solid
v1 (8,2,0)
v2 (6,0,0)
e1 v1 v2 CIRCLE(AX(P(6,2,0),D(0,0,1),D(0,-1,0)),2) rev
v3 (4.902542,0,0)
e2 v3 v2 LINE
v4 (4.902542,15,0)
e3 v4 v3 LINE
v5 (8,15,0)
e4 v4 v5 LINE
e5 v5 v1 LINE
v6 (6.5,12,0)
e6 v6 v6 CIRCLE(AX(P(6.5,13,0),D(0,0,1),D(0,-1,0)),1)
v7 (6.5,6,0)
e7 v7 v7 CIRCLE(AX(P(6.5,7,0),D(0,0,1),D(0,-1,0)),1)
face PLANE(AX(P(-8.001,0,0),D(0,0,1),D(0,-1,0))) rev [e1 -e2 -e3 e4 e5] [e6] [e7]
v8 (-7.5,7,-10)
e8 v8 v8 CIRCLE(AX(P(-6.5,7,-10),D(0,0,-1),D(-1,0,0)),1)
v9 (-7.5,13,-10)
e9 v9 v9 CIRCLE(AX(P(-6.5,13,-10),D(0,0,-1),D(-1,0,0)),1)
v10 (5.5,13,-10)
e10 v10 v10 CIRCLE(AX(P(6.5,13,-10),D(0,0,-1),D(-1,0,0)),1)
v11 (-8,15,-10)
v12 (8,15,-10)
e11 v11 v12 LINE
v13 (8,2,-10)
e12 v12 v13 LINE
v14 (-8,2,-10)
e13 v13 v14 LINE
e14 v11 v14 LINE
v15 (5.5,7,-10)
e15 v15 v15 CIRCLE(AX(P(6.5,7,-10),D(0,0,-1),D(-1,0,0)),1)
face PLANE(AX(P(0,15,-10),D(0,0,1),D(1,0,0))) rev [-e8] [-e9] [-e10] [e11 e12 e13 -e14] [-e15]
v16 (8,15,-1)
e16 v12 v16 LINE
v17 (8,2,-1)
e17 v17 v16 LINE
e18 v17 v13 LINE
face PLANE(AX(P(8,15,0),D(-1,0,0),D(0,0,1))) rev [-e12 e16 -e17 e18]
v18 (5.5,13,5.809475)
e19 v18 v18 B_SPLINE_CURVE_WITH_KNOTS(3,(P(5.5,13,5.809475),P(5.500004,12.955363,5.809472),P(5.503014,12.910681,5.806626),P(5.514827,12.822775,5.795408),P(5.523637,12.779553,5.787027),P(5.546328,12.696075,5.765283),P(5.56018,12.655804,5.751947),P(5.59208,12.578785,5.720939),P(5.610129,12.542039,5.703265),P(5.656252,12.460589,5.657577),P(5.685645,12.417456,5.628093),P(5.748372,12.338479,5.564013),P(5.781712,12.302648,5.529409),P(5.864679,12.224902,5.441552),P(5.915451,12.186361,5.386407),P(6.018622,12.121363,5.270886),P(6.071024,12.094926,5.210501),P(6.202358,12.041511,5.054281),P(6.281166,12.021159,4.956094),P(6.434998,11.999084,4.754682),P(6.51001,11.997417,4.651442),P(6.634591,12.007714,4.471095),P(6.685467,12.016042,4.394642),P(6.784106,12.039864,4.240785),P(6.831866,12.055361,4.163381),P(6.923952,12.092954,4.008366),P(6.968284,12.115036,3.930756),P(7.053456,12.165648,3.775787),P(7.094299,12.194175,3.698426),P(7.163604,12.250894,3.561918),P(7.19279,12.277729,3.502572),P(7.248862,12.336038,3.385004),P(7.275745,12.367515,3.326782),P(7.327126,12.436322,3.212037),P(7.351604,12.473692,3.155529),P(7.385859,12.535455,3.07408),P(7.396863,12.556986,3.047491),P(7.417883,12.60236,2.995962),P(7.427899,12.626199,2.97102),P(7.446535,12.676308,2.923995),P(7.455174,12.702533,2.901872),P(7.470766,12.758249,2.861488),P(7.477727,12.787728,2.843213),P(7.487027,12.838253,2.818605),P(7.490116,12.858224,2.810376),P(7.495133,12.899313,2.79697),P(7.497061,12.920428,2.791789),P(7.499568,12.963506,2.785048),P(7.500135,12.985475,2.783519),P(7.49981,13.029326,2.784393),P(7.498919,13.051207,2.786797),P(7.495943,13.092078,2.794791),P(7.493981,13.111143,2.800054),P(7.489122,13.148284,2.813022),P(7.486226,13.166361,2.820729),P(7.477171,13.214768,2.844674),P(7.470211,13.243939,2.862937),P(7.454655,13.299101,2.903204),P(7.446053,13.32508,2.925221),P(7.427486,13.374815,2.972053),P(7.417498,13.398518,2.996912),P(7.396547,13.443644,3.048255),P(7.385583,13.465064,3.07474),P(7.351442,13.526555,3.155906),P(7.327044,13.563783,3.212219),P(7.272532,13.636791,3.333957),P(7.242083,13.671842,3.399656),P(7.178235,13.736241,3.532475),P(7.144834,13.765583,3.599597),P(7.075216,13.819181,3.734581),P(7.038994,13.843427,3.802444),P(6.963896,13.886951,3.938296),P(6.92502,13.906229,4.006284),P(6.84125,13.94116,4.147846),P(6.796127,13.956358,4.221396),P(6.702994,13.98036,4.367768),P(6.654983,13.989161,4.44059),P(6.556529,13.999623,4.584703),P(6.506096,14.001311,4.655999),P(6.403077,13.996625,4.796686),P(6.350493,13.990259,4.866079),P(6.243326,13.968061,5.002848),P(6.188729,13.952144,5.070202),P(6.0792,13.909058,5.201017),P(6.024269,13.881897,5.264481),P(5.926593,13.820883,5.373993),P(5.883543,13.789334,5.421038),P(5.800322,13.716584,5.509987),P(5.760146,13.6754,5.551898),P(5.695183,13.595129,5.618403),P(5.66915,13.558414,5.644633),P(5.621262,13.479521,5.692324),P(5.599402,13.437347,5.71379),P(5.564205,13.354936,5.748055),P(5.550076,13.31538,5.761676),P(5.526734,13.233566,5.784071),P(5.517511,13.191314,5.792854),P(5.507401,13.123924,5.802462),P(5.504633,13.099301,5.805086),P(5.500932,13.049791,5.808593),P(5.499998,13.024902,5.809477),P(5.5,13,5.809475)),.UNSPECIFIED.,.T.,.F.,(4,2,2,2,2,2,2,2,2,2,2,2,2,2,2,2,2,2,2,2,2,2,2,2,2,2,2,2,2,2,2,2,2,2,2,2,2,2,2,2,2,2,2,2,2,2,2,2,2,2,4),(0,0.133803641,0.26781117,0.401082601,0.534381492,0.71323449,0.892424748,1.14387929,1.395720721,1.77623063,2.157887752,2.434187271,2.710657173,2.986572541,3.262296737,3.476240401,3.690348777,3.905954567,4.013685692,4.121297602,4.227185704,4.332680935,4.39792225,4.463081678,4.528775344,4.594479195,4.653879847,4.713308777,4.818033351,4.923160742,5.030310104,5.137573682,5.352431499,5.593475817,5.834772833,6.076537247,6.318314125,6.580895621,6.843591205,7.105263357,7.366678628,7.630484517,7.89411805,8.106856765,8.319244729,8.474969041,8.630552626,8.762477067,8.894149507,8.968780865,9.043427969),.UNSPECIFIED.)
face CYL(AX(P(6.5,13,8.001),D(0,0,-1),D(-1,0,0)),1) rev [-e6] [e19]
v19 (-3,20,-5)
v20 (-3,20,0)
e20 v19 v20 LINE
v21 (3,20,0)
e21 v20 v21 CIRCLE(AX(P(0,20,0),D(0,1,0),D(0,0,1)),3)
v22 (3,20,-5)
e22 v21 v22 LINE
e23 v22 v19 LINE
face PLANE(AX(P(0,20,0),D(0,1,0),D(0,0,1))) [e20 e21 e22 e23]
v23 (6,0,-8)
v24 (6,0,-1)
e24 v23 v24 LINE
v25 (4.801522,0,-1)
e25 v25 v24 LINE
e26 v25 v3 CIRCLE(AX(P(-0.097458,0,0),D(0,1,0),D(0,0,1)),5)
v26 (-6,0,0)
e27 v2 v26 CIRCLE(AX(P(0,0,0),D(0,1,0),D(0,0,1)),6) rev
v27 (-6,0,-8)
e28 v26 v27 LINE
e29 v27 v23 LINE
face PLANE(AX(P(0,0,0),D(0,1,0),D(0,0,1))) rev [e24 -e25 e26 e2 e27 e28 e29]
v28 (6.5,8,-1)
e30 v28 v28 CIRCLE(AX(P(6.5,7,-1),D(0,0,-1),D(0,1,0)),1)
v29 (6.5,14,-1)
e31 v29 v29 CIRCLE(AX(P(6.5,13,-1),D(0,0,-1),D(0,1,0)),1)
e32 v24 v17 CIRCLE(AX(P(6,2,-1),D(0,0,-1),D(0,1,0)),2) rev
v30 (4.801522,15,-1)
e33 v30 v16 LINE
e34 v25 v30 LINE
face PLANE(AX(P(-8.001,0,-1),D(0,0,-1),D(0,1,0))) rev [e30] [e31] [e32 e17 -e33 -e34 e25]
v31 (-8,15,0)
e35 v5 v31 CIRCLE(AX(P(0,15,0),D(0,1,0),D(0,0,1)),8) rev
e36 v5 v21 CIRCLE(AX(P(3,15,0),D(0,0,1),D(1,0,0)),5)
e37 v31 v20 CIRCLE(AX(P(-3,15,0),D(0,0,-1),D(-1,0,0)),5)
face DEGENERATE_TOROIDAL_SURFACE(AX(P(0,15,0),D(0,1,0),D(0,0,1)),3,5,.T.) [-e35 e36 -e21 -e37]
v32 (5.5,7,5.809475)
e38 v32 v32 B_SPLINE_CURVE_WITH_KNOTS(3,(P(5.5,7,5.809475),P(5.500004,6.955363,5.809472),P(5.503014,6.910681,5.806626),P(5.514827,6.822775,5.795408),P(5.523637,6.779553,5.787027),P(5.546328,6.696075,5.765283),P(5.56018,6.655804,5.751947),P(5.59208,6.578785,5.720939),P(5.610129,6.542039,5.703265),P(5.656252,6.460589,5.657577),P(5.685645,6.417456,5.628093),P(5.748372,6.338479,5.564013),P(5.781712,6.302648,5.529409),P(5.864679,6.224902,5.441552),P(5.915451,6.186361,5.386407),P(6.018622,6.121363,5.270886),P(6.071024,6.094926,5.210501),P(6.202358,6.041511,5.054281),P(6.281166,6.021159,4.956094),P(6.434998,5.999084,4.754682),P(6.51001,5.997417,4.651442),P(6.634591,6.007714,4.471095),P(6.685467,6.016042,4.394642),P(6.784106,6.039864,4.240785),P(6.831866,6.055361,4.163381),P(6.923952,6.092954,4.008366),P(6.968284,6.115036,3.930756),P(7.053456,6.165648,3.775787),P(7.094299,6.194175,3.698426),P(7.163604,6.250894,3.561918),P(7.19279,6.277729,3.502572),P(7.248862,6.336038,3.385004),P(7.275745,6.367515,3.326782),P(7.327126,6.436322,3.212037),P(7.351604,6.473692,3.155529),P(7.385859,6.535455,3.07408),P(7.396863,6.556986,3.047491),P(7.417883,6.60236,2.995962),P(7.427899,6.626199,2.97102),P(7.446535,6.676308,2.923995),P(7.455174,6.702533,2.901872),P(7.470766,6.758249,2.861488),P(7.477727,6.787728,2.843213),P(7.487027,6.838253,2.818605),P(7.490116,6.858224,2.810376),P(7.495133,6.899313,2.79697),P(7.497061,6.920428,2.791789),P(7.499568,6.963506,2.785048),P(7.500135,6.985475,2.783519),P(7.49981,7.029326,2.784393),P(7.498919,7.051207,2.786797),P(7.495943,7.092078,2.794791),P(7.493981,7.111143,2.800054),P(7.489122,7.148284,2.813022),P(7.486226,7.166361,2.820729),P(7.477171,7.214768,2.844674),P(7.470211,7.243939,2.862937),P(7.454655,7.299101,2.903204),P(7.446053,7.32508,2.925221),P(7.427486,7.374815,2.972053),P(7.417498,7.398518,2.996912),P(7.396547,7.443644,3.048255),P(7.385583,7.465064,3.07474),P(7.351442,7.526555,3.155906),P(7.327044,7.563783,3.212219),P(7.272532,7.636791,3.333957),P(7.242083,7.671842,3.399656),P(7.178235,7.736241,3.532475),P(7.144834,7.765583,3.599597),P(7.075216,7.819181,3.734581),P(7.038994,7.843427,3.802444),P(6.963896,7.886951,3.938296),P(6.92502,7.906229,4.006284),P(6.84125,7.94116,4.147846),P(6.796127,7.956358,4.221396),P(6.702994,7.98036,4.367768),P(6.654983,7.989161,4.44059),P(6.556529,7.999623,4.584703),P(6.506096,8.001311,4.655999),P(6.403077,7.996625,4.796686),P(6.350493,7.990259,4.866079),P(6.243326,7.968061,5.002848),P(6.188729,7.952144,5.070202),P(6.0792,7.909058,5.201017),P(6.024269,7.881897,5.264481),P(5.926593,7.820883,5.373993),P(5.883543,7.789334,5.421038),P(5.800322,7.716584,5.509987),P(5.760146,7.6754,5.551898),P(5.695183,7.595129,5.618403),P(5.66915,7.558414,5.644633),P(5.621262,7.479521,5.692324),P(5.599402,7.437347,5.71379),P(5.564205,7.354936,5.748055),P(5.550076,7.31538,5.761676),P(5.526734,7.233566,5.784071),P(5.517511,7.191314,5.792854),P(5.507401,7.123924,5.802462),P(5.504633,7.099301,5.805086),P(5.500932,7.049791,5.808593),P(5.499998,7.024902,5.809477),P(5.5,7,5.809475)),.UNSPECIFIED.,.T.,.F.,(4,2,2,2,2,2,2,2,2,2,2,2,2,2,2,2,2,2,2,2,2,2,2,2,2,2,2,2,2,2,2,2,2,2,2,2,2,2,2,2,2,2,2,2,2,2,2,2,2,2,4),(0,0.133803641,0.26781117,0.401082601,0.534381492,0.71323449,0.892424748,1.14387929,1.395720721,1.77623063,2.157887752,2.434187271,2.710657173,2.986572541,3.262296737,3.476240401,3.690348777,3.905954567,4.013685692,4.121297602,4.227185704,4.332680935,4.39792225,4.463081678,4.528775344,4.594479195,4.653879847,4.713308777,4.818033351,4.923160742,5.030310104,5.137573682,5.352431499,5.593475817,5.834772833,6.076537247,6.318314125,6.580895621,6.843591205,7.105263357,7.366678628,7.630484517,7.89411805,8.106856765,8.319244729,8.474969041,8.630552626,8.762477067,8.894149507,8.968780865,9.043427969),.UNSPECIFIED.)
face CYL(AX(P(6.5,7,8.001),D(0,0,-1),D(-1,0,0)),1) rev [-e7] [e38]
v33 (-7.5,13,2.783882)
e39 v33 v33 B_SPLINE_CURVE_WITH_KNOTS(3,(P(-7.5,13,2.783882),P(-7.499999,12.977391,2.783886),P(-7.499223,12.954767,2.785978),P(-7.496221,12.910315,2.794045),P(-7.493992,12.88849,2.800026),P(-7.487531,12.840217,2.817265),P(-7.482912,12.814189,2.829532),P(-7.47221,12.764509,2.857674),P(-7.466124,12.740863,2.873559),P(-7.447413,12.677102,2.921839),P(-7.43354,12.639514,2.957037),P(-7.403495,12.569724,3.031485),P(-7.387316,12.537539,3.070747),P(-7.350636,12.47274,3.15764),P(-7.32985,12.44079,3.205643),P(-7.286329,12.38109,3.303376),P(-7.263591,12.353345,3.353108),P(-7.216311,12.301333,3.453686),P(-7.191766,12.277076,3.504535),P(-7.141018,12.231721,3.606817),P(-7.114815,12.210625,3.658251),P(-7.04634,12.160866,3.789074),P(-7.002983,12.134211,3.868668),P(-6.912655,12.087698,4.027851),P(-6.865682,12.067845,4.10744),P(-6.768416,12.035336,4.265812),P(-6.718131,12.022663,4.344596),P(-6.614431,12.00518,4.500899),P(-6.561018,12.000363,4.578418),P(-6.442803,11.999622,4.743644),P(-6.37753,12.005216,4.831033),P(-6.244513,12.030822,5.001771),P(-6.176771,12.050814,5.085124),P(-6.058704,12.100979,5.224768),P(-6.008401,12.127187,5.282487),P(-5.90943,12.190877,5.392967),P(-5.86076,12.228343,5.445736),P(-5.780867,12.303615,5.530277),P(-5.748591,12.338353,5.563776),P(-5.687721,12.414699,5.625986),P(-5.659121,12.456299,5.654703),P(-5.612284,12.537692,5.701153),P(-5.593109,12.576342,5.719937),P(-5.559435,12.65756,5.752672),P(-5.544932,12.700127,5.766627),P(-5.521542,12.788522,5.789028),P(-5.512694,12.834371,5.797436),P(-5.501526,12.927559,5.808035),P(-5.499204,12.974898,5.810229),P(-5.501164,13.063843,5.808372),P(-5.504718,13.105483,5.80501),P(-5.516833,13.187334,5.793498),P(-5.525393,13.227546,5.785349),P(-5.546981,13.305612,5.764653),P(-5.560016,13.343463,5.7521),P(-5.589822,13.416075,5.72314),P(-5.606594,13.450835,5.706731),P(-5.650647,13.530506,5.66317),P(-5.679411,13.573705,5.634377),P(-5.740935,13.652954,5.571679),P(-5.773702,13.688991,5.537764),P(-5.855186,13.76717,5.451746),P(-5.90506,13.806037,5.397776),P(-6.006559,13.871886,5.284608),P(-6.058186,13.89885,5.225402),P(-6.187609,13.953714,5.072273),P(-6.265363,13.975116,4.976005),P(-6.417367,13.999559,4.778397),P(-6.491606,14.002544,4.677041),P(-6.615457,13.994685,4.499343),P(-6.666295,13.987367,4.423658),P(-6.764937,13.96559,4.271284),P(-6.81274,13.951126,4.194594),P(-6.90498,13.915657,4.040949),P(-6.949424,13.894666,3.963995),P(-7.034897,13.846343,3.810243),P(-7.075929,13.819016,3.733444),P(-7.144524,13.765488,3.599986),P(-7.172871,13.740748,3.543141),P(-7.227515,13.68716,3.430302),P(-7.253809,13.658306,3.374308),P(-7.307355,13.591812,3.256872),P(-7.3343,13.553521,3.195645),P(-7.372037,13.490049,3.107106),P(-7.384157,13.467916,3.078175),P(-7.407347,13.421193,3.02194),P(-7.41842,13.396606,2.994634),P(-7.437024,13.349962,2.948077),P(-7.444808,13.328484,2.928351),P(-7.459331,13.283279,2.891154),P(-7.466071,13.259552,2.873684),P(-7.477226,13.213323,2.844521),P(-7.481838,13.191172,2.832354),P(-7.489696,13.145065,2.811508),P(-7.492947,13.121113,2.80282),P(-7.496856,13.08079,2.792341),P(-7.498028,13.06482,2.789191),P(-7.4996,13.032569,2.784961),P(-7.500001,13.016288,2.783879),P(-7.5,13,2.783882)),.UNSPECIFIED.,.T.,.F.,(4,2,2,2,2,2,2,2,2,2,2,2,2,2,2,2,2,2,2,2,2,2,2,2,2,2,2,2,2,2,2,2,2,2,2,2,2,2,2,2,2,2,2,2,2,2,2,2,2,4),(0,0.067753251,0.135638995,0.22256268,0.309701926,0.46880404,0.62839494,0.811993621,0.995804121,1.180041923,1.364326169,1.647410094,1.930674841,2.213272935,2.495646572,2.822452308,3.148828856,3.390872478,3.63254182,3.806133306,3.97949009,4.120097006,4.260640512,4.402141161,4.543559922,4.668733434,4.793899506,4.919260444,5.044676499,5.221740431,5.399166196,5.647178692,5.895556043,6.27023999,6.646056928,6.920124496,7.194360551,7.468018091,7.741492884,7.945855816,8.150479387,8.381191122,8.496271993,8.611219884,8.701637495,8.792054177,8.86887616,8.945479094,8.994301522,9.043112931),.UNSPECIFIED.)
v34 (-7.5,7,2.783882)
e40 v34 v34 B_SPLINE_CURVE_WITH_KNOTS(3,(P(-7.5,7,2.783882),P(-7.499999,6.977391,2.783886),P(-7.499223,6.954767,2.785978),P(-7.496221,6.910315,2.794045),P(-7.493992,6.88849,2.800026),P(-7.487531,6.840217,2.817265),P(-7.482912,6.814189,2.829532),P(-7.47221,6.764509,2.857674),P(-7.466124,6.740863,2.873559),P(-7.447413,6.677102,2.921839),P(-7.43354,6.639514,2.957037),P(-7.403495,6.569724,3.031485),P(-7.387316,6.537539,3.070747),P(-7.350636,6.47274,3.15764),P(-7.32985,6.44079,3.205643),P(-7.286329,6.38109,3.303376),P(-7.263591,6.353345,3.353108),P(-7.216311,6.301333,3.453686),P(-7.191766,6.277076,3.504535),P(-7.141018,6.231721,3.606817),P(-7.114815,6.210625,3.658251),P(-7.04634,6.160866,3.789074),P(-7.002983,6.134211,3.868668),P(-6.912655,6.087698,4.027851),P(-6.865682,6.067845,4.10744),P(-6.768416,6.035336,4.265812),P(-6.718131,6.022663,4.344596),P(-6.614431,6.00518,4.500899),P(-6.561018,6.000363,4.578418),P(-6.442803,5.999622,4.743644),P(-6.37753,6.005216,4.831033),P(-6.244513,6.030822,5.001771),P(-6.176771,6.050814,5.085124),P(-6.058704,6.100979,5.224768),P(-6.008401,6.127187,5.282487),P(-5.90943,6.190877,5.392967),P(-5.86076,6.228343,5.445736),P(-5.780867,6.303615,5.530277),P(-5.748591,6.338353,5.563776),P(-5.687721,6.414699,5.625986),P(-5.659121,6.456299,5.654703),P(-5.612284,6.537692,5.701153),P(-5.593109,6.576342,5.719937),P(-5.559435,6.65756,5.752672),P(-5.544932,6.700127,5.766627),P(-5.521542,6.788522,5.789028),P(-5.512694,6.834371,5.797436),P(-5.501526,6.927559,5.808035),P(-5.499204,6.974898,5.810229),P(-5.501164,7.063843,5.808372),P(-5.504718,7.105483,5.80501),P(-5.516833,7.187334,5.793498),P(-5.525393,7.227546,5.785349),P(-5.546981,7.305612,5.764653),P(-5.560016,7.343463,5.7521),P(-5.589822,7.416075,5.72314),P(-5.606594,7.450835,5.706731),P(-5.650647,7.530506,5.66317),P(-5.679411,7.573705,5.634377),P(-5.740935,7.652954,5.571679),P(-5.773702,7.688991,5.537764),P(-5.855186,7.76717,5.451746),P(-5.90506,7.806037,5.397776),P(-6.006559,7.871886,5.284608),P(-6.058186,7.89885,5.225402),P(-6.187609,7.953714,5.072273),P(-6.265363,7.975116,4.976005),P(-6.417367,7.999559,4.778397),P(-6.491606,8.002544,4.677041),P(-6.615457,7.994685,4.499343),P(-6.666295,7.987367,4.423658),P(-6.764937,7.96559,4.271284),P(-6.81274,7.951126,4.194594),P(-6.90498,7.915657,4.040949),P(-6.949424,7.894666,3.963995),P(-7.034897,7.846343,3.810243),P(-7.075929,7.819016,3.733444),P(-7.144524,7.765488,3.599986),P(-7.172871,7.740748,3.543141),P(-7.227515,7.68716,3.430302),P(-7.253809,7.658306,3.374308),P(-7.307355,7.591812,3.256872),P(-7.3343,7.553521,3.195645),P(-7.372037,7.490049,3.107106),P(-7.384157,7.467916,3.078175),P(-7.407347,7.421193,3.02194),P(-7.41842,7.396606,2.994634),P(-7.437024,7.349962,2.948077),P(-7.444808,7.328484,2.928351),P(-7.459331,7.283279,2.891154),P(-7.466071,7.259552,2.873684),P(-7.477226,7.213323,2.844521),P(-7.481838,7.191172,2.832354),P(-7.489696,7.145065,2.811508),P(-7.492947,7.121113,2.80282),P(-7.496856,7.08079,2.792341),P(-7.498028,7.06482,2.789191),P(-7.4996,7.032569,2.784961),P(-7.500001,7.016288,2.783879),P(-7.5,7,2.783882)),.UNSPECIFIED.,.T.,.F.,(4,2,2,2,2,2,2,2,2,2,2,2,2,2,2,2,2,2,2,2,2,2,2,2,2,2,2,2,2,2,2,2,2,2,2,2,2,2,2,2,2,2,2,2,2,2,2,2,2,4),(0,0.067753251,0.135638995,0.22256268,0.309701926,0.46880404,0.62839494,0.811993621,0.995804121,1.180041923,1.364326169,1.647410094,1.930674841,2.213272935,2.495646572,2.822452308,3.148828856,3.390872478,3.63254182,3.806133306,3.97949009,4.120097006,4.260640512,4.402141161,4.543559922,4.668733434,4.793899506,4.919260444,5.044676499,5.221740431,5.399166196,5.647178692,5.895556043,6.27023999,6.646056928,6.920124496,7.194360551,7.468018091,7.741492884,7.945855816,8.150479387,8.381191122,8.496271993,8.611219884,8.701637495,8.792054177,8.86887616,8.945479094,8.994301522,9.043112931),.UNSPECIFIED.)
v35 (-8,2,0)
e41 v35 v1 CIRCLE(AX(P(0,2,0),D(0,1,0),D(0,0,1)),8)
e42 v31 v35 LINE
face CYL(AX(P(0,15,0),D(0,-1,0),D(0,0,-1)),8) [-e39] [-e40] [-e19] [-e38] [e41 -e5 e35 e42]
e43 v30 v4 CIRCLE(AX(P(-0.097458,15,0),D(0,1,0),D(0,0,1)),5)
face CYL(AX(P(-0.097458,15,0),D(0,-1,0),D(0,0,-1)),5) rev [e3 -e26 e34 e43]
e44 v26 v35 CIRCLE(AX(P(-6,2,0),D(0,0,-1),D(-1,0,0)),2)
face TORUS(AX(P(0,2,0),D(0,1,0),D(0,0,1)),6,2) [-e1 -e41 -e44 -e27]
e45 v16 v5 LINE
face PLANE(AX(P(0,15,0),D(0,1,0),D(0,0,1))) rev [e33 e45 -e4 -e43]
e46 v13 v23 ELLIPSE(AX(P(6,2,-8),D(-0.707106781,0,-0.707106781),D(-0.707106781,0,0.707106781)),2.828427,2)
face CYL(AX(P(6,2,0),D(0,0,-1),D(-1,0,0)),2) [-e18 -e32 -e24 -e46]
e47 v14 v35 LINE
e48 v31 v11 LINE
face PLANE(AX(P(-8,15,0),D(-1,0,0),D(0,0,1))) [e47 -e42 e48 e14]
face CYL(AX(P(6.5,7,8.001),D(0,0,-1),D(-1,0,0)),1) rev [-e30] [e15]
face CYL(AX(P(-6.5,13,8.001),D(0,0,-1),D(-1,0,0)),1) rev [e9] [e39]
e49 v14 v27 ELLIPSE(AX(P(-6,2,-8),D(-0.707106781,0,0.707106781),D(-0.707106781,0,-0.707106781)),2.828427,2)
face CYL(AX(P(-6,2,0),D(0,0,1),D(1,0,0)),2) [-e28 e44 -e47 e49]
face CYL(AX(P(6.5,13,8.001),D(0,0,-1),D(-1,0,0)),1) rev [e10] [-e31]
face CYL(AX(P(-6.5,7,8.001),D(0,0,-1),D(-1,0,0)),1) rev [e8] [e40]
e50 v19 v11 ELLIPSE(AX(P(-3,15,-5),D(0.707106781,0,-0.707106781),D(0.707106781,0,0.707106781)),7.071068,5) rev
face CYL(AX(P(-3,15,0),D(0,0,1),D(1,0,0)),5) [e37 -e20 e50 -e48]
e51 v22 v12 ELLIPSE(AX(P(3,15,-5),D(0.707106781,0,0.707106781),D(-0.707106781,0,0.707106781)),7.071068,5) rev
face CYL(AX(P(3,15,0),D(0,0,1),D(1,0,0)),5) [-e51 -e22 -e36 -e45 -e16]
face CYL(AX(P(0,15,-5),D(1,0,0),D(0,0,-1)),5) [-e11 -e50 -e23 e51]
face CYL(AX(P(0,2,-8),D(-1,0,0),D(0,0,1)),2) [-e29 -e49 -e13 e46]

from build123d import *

# Parameters (mm, degrees)
BOSS_EXTRU_1_DEPTH           = 15
ESQUISSE3_R                  = 5
BOSS_EXTRU_3_DEPTH           = 5
ENL_V_MAT_EXTRU_2_REACH      = 30.071
ESQUISSE4_R                  = 1
ENL_V_MAT_EXTRU_3_REACH      = 29.495
ENL_V_MAT_EXTRU_3_END_RADIUS = 5
ESQUISSE5_W                  = 1
ESQUISSE5_H                  = 15
CONG_3_START                 = -10
CONG_3_DEPTH                 = 18
CONG_3_START_2               = -9
CONG_3_2_DEPTH               = 18
CONG_3_3_ANGLE               = 180
CONG_5_R                     = 2


with BuildPart() as part:
    # Esquisse1 → Boss.-Extru.1 (new body)
    with BuildSketch(Plane(origin=(0, 0, 0), x_dir=(1, 0, 0), z_dir=(0, 1, 0))):
        with BuildLine():
            ThreePointArc((-8, 0), (0, 8), (8, 0))
            Line((8, 0), (8, 10))
            Line((8, 10), (-8, 10))
            Line((-8, 10), (-8, 0))
        make_face()
        with BuildLine():
            ThreePointArc((-8, 0), (0, -8), (8, 0))
            Line((8, 0), (4.902542424, 0))
            ThreePointArc((4.902542424, 0), (-0.097457576, -5), (-5.097457576, 0))
            Line((-5.097457576, 0), (-8, 0))
        make_face()
        with BuildLine():
            Line((4.902542424, 0), (8, 0))
            ThreePointArc((8, 0), (0, 8), (-8, 0))
            Line((-8, 0), (-5.097457576, 0))
            ThreePointArc((-5.097457576, 0), (-0.097457576, 5), (4.902542424, 0))
        make_face()
    extrude(amount=BOSS_EXTRU_1_DEPTH)

    # Esquisse3 → Boss.-Extru.3 (add)
    # profile 1 of 3: a face of its own
    with BuildSketch(Plane(origin=(0, 15, 0), x_dir=(1, 0, 0), z_dir=(0, 1, 0))):
        with BuildLine():
            ThreePointArc((8, 0), (0, 8), (-8, 0))
            ThreePointArc((-8, 0), (0, -8), (8, 0))
        make_face()
        with Locations(Location((-0.097457576, 0, 0), (0, 0, 270))):
            Circle(ESQUISSE3_R, mode=Mode.SUBTRACT)
    # profile 2 of 3: a face of its own
    with BuildSketch(Plane(origin=(0, 15, 0), x_dir=(1, 0, 0), z_dir=(0, 1, 0))):
        with Locations(Location((-0.097457576, 0, 0), (0, 0, 270))):
            Circle(ESQUISSE3_R)
    # profile 3 of 3: a face of its own
    with BuildSketch(Plane(origin=(0, 15, 0), x_dir=(1, 0, 0), z_dir=(0, 1, 0))):
        with BuildLine():
            Line((-8, 10), (-8, 0))
            ThreePointArc((-8, 0), (0, 8), (8, 0))
            Line((8, 0), (8, 10))
            Line((8, 10), (-8, 10))
        make_face()
    extrude(amount=BOSS_EXTRU_3_DEPTH)

    # Esquisse4 → Enlèv. mat.-Extru.2 (cut, up to next)
    with BuildSketch(Plane(origin=(0, 0, -10), x_dir=(-1, 0, 0), z_dir=(0, 0, -1)), mode=Mode.PRIVATE) as enl_v_mat_extru_2_sk1:
        with Locations((-6.5, 13)):
            Circle(ESQUISSE4_R)
    enl_v_mat_extru_2_tool1 = extrude(enl_v_mat_extru_2_sk1.sketch, amount=-ENL_V_MAT_EXTRU_2_REACH, mode=Mode.PRIVATE) & part.part
    # Esquisse4 → Enlèv. mat.-Extru.2 (cut, up to next)
    with BuildSketch(Plane(origin=(0, 0, -10), x_dir=(-1, 0, 0), z_dir=(0, 0, -1)), mode=Mode.PRIVATE) as enl_v_mat_extru_2_sk2:
        with Locations((6.5, 13)):
            Circle(ESQUISSE4_R)
    enl_v_mat_extru_2_tool2 = extrude(enl_v_mat_extru_2_sk2.sketch, amount=-ENL_V_MAT_EXTRU_2_REACH, mode=Mode.PRIVATE) & part.part
    # Esquisse4 → Enlèv. mat.-Extru.2 (cut, up to next)
    with BuildSketch(Plane(origin=(0, 0, -10), x_dir=(-1, 0, 0), z_dir=(0, 0, -1)), mode=Mode.PRIVATE) as enl_v_mat_extru_2_sk3:
        with Locations((6.5, 7)):
            Circle(ESQUISSE4_R)
    enl_v_mat_extru_2_tool3 = extrude(enl_v_mat_extru_2_sk3.sketch, amount=-ENL_V_MAT_EXTRU_2_REACH, mode=Mode.PRIVATE) & part.part
    # Esquisse4 → Enlèv. mat.-Extru.2 (cut, up to next)
    with BuildSketch(Plane(origin=(0, 0, -10), x_dir=(-1, 0, 0), z_dir=(0, 0, -1)), mode=Mode.PRIVATE) as enl_v_mat_extru_2_sk4:
        with Locations((-6.5, 7)):
            Circle(ESQUISSE4_R)
    enl_v_mat_extru_2_tool4 = extrude(enl_v_mat_extru_2_sk4.sketch, amount=-ENL_V_MAT_EXTRU_2_REACH, mode=Mode.PRIVATE) & part.part
    add(enl_v_mat_extru_2_tool1.solids().sort_by_distance((6.5, 13, -10))[0], mode=Mode.SUBTRACT)
    add(enl_v_mat_extru_2_tool2.solids().sort_by_distance((-6.5, 13, -10))[0], mode=Mode.SUBTRACT)
    add(enl_v_mat_extru_2_tool3.solids().sort_by_distance((-6.5, 7, -10))[0], mode=Mode.SUBTRACT)
    add(enl_v_mat_extru_2_tool4.solids().sort_by_distance((6.5, 7, -10))[0], mode=Mode.SUBTRACT)

    # Enlèv. mat.-Extru.3: up to this cylinder (the profile starts outside it)
    enl_v_mat_extru_3_end = Plane(origin=(-0.097457576, 7.5, 0), z_dir=(0, -1, 0)) * Cylinder(ENL_V_MAT_EXTRU_3_END_RADIUS, 69.99, mode=Mode.PRIVATE)
    # Esquisse5 → Enlèv. mat.-Extru.3 (cut, up to the surface)
    with BuildSketch(Plane(origin=(8, 0, 0), x_dir=(0, 0, -1), z_dir=(1, 0, 0)), mode=Mode.PRIVATE) as enl_v_mat_extru_3_sk1:
        with Locations((0.5, 7.5)):
            Rectangle(ESQUISSE5_W, ESQUISSE5_H)
    enl_v_mat_extru_3_tool1 = extrude(enl_v_mat_extru_3_sk1.sketch, amount=-ENL_V_MAT_EXTRU_3_REACH, mode=Mode.PRIVATE) - enl_v_mat_extru_3_end
    add(enl_v_mat_extru_3_tool1.solids().sort_by_distance((8, 7.5, -0.5))[0], mode=Mode.SUBTRACT)

    # Congé3: read off the stored shape, not the designer's step
    # Congé3 outline → Congé3 (cut)
    with BuildSketch(Plane.XY.offset(CONG_3_START)):
        with BuildLine():
            ThreePointArc((-8, 15), (-6.535533906, 18.535533906), (-3, 20))
            Line((-3, 20), (-8, 20))
            Line((-8, 20), (-8, 15))
        make_face()
        with BuildLine():
            ThreePointArc((3, 20), (6.535533906, 18.535533906), (8, 15))
            Line((8, 15), (8, 20))
            Line((8, 20), (3, 20))
        make_face()
    extrude(amount=CONG_3_DEPTH, mode=Mode.SUBTRACT)

    # Cong_3 2 outline → Cong_3 2 (cut)
    with BuildSketch(Plane.YZ.offset(CONG_3_START_2)):
        with BuildLine():
            ThreePointArc((20, -5), (18.535533906, -8.535533906), (15, -10))
            Line((15, -10), (20, -10))
            Line((20, -10), (20, -5))
        make_face()
    extrude(amount=CONG_3_2_DEPTH, mode=Mode.SUBTRACT)

    # Cong_3 3 outline → Cong_3 3 (revolve, cut)
    with BuildSketch(Plane(origin=(0, 0, 0), x_dir=(-1, 0, 0), z_dir=(0, 0, -1))):
        with BuildLine():
            ThreePointArc((3, 20), (6.535533906, 18.535533906), (8, 15))
            Line((8, 15), (8, 20))
            Line((8, 20), (3, 20))
        make_face()
    revolve(axis=Axis((0, 0, 0), (0, 1, 0)), revolution_arc=CONG_3_3_ANGLE, mode=Mode.SUBTRACT)

    # Congé5
    cong_5_edges = [part.edges().sort_by_distance(p)[0] for p in [
        (8, 0, -5.5),
        (0, 0, -10),
        (0, 0, 8),
        (-8, 0, -5),
    ]]
    fillet(cong_5_edges, radius=CONG_5_R)


solid = part.part
